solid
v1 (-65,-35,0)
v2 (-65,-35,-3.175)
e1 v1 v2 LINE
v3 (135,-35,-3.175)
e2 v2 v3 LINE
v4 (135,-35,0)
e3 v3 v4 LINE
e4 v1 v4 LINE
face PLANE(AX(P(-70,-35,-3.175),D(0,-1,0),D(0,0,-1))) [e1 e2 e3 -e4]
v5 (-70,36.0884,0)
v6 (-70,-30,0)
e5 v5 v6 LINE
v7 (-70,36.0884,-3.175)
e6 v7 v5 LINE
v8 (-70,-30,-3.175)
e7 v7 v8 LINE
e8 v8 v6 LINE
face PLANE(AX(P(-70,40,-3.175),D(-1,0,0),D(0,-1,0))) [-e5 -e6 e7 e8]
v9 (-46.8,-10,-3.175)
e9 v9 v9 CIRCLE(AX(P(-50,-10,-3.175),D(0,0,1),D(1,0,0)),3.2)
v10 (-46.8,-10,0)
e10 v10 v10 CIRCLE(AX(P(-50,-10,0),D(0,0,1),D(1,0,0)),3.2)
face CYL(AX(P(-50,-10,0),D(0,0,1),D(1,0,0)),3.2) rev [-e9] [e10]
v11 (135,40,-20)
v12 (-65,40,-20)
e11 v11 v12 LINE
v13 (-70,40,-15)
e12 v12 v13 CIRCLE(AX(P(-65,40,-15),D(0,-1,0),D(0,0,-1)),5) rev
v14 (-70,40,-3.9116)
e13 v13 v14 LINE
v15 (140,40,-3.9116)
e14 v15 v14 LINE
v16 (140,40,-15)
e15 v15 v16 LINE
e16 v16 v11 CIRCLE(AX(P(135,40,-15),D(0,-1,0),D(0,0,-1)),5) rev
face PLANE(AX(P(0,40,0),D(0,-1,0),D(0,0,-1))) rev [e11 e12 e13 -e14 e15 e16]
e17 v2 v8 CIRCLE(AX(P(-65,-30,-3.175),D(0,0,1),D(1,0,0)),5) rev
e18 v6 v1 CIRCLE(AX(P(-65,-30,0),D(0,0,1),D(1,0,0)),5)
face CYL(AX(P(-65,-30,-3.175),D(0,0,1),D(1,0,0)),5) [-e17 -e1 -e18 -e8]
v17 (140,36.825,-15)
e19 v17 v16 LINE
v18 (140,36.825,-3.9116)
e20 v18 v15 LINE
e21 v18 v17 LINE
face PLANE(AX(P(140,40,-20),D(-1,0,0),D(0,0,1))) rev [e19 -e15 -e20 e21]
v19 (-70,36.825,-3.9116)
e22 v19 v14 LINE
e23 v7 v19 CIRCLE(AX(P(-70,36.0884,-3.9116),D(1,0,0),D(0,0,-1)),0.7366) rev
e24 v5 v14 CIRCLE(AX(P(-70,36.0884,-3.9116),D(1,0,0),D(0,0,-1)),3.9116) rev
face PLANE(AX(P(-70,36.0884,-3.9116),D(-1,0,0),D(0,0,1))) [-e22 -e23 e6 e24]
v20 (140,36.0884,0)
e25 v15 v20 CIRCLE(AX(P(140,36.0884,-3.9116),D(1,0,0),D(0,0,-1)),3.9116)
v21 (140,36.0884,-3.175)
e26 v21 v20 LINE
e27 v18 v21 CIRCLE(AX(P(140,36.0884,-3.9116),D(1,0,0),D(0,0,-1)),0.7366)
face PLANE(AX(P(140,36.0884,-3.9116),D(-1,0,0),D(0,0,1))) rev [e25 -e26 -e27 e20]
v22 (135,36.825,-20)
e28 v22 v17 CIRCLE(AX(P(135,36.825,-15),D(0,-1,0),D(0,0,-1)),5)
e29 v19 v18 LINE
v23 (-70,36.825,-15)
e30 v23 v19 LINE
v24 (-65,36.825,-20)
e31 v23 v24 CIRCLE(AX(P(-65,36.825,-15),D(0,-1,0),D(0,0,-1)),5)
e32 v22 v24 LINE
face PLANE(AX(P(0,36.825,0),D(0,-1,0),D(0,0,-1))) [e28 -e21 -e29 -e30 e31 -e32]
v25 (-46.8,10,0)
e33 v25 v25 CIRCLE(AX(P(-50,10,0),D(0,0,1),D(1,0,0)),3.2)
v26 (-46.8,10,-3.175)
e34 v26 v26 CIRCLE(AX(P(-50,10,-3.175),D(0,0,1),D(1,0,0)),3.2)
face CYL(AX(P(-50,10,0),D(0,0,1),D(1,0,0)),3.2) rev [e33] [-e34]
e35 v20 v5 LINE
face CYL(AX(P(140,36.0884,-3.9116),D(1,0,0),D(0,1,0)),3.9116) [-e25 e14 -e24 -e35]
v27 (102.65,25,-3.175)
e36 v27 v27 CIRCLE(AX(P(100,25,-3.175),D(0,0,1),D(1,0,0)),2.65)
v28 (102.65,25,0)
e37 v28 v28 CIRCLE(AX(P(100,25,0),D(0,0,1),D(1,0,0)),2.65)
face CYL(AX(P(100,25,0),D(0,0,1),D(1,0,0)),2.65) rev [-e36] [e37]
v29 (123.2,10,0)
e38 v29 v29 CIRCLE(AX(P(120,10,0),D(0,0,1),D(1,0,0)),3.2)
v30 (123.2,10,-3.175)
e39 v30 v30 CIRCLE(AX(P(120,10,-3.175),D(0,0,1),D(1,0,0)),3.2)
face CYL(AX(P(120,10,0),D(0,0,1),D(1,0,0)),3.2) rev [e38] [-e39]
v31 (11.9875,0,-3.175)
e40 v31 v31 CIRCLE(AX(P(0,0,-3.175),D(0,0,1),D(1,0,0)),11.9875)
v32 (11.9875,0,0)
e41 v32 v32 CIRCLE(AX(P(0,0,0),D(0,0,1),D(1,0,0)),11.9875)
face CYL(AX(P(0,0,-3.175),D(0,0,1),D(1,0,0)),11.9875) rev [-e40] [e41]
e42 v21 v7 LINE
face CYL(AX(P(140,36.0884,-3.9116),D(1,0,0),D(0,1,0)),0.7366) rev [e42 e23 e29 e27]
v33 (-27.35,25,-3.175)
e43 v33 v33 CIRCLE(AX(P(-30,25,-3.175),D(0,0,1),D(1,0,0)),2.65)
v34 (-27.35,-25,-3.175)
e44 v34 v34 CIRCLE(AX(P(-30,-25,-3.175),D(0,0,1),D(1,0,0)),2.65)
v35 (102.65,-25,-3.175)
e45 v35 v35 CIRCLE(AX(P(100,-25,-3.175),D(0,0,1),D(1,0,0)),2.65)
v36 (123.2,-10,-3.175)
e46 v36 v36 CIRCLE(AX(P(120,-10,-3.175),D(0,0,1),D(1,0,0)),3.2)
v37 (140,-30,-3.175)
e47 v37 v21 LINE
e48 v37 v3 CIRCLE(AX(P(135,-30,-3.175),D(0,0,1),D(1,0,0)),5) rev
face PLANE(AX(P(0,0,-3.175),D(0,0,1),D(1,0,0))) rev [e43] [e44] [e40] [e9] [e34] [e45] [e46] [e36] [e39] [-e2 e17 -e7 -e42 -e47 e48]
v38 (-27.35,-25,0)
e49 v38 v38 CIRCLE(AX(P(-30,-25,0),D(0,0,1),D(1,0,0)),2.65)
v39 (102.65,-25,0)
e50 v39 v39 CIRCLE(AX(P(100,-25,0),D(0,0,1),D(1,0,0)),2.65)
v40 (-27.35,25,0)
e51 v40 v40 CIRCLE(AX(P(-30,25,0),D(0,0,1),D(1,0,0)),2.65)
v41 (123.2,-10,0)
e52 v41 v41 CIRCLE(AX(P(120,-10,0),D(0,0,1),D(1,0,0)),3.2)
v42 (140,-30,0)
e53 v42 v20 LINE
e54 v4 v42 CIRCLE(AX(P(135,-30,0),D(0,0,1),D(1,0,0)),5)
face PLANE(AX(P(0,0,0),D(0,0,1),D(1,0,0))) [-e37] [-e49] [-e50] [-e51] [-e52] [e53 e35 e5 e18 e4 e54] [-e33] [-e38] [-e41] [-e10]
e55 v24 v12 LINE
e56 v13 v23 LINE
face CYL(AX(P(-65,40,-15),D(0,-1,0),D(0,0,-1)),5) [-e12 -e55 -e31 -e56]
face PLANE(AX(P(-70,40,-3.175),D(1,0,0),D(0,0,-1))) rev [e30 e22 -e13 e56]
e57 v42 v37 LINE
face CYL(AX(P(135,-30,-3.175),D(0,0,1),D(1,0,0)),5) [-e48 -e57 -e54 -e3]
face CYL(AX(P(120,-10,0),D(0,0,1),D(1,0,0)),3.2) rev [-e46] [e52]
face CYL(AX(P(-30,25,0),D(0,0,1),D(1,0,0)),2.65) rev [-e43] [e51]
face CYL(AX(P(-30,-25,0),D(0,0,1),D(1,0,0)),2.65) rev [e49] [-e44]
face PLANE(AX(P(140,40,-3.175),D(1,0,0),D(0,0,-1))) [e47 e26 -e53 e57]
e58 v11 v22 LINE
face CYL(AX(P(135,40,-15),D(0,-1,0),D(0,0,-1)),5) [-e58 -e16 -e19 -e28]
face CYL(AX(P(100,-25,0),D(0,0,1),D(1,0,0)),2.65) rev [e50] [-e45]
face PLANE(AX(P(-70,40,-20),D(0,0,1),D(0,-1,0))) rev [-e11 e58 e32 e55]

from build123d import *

# Parameters (mm, degrees)
SKETCH1_W                    = 210
SKETCH1_H                    = 75
SKETCH1_R                    = 11.9875
BASE_FLANGE1_DEPTH           = 3.175
EDGE_FLANGE1_STRIP_W         = 14.1732
EDGE_FLANGE1_STRIP_H         = 3.175
EDGE_FLANGE1_STRIP_CUT_DEPTH = 210
EDGE_FLANGE1_DEPTH           = 210
M6_CLEARANCE_HOLE2_D         = 6.4
M5_CLEARANCE_HOLE1_D         = 5.3
FILLET1_R                    = 5


# Sheet-metal steps are written as plain solids
with BuildPart() as part:
    # Sketch1 → Base-Flange1 (new body)
    with BuildSketch(Plane.XY):
        with Locations((35, 2.5)):
            Rectangle(SKETCH1_W, SKETCH1_H)
        Circle(SKETCH1_R, mode=Mode.SUBTRACT)
    extrude(amount=-BASE_FLANGE1_DEPTH)

    # Edge-Flange1 strip (across the edge) → Edge-Flange1 strip cut (cut)
    with BuildSketch(Plane(origin=(-70, 40, -3.175), x_dir=(0, -1, 0), z_dir=(1, 0, 0))):
        with Locations((-3.175, -1.5875)):
            Rectangle(EDGE_FLANGE1_STRIP_W, EDGE_FLANGE1_STRIP_H)
    extrude(amount=EDGE_FLANGE1_STRIP_CUT_DEPTH, mode=Mode.SUBTRACT)

    # Edge-Flange1 section (across the edge) → Edge-Flange1 (add)
    with BuildSketch(Plane(origin=(-70, 40, -3.175), x_dir=(0, -1, 0), z_dir=(1, 0, 0))):
        with BuildLine():
            Line((0, 0.7366), (0, 16.825))
            Line((0, 16.825), (3.175, 16.825))
            Line((3.175, 16.825), (3.175, 0.7366))
            ThreePointArc((3.175, 0.7366), (3.390745145, 0.215745145), (3.9116, 0))
            Line((3.9116, 0), (3.9116, -3.175))
            ThreePointArc((3.9116, -3.175), (1.145681115, -2.029318885), (0, 0.7366))
        make_face()
    extrude(amount=EDGE_FLANGE1_DEPTH)

    # M6 Clearance Hole2 (through all)
    with Locations(Plane(origin=(-50, 10, 0), x_dir=(1, 0, 0), z_dir=(0, 0, 1))):
        with Locations((0, 0), (0, -20), (170, -20), (170, 0)):
            Hole(M6_CLEARANCE_HOLE2_D / 2)

    # M5 Clearance Hole1 (through all)
    with Locations(Plane(origin=(-30, 25, 0), x_dir=(1, 0, 0), z_dir=(0, 0, 1))):
        with Locations((0, 0), (0, -50), (130, -50), (130, 0)):
            Hole(M5_CLEARANCE_HOLE1_D / 2)

    # Fillet1
    fillet1_edges = [part.edges().sort_by_distance(p)[0] for p in [
        (-70, 38.4125, -20),
        (140, 38.4125, -20),
        (140, -35, -1.5875),
        (-70, -35, -1.5875),
    ]]
    fillet(fillet1_edges, radius=FILLET1_R)


solid = part.part
